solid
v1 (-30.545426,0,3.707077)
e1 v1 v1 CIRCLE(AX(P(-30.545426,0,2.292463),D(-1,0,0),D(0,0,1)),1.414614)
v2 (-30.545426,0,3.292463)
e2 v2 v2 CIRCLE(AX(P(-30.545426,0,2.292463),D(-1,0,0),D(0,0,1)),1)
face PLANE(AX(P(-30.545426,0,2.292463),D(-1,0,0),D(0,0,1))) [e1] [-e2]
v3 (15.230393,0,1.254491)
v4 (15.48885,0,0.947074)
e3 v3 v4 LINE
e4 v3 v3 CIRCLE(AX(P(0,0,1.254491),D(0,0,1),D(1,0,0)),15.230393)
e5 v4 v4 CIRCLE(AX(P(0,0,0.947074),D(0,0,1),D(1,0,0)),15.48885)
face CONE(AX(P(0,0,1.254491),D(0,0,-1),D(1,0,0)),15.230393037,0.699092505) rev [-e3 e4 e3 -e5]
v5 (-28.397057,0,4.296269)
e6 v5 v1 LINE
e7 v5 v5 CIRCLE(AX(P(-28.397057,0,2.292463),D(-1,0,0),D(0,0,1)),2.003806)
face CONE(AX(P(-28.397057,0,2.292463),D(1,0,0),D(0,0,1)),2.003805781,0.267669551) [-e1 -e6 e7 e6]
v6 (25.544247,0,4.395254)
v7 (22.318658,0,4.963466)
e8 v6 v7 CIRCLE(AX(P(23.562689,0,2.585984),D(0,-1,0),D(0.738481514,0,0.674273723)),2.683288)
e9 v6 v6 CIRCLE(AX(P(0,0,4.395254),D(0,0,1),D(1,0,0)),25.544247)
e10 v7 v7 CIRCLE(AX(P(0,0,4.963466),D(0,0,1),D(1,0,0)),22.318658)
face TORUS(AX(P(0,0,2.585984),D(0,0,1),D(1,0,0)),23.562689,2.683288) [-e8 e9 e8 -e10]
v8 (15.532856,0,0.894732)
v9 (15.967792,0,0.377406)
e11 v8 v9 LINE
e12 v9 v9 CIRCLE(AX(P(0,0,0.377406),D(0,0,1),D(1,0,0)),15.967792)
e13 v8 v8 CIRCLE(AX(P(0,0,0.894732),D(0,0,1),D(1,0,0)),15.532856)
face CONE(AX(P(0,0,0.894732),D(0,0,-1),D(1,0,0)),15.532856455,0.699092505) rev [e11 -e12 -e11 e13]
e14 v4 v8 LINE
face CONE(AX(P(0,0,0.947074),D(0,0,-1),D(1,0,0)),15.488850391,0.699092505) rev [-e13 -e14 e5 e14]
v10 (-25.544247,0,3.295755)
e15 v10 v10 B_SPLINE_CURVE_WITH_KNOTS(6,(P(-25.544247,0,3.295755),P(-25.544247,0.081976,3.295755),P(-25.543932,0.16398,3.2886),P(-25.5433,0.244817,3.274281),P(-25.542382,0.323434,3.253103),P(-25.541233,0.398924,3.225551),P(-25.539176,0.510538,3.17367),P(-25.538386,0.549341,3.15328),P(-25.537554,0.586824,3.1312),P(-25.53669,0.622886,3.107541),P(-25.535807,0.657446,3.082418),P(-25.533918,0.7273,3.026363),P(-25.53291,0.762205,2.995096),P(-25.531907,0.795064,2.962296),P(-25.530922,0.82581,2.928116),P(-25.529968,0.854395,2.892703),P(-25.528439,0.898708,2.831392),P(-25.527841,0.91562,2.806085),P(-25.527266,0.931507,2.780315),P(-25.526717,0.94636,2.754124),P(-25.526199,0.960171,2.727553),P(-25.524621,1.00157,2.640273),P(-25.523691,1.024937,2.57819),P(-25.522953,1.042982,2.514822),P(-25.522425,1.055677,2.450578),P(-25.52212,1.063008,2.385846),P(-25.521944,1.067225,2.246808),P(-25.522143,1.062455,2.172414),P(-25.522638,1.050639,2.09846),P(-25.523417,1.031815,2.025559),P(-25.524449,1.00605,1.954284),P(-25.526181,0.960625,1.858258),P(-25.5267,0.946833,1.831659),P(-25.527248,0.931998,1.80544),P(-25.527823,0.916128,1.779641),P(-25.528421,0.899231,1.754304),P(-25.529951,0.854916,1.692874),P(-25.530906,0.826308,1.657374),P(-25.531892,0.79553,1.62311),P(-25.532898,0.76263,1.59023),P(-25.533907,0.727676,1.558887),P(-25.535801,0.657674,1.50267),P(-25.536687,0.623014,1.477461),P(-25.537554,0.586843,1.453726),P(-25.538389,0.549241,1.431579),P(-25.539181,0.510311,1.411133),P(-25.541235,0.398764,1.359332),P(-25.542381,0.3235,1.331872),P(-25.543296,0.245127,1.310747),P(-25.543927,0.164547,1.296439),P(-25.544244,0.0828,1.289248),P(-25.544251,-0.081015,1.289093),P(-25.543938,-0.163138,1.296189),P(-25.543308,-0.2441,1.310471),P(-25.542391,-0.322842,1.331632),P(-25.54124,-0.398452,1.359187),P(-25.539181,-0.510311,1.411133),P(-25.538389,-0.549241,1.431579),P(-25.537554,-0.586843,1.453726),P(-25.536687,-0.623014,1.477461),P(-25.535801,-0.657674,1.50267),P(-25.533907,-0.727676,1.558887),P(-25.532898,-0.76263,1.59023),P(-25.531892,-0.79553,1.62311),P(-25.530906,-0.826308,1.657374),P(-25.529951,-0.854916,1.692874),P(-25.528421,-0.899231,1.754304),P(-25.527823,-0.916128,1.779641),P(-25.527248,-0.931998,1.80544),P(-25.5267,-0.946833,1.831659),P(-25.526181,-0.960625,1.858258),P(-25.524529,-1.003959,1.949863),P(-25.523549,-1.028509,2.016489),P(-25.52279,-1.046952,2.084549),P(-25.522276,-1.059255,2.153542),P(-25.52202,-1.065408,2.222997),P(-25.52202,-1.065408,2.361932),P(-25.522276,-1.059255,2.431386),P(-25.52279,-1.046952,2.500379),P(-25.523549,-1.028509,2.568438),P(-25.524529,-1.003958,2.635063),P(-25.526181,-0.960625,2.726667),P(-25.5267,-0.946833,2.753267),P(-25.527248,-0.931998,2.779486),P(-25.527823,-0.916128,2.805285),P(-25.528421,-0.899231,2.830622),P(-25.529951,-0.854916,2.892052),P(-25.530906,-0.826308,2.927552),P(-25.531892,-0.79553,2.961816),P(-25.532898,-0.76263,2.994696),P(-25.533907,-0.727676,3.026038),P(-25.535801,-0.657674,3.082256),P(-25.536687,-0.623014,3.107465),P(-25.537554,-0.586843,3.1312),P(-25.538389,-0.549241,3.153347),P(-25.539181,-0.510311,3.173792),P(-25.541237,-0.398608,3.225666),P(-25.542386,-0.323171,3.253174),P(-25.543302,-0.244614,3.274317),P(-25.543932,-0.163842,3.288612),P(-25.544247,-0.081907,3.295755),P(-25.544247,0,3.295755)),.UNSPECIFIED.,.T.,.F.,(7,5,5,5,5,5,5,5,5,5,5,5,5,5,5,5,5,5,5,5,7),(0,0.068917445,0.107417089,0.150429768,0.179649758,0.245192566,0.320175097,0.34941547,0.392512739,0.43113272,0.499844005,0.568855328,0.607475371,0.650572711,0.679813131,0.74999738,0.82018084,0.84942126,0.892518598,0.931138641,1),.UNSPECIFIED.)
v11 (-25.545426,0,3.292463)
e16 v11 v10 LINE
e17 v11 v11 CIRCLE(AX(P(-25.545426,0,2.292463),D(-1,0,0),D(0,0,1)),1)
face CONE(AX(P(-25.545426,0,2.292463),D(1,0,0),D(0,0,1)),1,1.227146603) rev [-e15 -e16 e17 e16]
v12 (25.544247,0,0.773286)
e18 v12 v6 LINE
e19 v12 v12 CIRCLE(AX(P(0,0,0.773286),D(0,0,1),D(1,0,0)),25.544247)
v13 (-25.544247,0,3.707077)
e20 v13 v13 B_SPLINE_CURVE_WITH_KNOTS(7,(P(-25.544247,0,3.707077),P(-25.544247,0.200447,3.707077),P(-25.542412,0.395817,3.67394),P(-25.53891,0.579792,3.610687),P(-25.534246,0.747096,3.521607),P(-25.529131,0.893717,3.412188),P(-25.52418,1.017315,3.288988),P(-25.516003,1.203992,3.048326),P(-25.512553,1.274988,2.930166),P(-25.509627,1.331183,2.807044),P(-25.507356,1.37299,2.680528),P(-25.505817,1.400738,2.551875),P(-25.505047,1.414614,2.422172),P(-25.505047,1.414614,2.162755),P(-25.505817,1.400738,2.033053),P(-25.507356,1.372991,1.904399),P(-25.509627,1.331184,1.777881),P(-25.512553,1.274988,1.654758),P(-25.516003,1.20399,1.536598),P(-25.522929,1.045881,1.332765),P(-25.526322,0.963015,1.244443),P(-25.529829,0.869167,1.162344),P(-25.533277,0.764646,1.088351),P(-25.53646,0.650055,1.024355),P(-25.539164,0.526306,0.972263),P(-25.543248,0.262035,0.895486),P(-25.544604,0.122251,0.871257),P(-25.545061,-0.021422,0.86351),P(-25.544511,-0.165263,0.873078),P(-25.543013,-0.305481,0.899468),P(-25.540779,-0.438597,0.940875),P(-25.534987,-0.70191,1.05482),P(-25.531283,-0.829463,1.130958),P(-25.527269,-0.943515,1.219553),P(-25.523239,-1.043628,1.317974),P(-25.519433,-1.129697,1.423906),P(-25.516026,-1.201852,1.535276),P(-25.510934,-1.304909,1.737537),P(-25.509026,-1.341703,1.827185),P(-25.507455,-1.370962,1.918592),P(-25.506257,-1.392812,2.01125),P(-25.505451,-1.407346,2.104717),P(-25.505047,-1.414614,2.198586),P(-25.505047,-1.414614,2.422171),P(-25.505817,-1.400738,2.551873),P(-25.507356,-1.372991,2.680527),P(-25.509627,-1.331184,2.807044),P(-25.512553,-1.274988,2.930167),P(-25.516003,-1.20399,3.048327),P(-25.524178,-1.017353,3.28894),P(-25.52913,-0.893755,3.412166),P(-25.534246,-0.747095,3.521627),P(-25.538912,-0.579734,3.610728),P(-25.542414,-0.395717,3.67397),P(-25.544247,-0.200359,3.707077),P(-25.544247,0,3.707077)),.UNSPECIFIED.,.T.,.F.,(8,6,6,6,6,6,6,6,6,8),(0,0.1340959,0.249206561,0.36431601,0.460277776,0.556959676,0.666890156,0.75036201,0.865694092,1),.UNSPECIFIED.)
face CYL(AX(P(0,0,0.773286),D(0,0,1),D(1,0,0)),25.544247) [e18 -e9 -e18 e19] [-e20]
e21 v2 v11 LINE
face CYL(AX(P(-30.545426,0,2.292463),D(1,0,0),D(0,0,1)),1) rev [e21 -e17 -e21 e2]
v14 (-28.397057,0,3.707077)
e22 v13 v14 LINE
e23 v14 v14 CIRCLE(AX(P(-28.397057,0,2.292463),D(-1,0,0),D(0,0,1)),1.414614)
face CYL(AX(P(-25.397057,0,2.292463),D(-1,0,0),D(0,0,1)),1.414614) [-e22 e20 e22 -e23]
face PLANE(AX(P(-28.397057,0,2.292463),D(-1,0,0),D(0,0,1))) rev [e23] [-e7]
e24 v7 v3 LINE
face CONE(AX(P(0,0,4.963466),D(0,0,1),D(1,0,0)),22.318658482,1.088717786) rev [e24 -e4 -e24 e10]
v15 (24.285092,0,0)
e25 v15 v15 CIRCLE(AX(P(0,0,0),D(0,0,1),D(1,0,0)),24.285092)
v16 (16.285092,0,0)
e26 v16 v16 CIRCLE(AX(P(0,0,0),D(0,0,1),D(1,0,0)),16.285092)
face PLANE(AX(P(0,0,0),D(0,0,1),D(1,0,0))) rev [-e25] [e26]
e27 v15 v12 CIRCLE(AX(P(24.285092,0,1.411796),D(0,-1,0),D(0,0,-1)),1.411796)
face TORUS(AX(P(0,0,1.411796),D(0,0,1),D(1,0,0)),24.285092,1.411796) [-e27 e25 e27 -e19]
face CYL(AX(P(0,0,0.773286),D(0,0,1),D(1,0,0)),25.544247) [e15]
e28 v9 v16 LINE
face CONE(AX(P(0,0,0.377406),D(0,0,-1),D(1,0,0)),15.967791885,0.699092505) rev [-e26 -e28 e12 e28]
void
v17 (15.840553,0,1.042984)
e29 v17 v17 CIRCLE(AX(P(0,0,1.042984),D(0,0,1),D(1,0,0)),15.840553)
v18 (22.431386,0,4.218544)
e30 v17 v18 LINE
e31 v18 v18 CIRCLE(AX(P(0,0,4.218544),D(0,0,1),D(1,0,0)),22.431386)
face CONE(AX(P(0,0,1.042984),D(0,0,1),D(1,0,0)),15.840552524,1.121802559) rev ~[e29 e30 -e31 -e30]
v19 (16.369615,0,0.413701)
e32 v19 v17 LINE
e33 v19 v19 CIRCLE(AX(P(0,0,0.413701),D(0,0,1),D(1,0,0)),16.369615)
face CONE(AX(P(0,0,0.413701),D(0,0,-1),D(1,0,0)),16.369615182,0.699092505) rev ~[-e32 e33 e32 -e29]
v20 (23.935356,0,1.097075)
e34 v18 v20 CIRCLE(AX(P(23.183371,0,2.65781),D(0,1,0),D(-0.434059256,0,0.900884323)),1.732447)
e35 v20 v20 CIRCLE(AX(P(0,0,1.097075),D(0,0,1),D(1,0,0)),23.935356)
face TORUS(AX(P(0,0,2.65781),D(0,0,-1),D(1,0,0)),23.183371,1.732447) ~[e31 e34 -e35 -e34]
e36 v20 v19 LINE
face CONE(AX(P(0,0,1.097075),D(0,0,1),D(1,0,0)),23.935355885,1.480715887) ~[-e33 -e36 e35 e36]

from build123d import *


# Not quite as in the source:
# - a feature names something its author has since deleted; it is built from what else it names


with BuildPart() as f1:
    # F0 (on Front) → F1 (revolve)
    with BuildSketch(Plane.XZ):
        with BuildLine():
            Line((22.3186584817, 4.9634656969), (15.2303930372, 1.2544910423))
            Line((15.2303930372, 1.2544910423), (15.488850391, 0.9470738952))
            Line((15.488850391, 0.9470738952), (15.5328564546, 0.894731726))
            Line((15.5328564546, 0.894731726), (15.8405525238, 1.0429841968))
            Line((15.8405525238, 1.0429841968), (22.4313864066, 4.2185444515))
            ThreePointArc((22.4313864066, 4.2185444515), (24.744105662, 3.4097946744), (23.9353558848, 1.097075419))
            Line((23.9353558848, 1.097075419), (16.3696151821, 0.4137007552))
            Line((16.3696151821, 0.4137007552), (15.9677918852, 0.3774061119))
            Line((15.9677918852, 0.3774061119), (16.2850916386, 0))
            Line((16.2850916386, 0), (24.2850916386, 0))
            ThreePointArc((24.2850916386, 0), (25.023915829, 0.2087553322), (25.5442474517, 0.7732860891))
            Line((25.5442474517, 0.7732860891), (25.5442474517, 4.3952541752))
            ThreePointArc((25.5442474517, 4.3952541752), (24.028202675, 5.2285828576), (22.3186584817, 4.9634656969))
        make_face()
        Polygon((15.8405525238, 1.0429841968), (15.5328564546, 0.894731726), (15.9677918852, 0.3774061119), (16.3696151821, 0.4137007552), align=None)
    revolve(axis=Axis((0, 0, 1.8443568842), (0, 0, 1)))

    # F2 (on Front) → F3 (revolve)
    with BuildSketch(Plane.XZ):
        Polygon((-25.3970567137, 3.7070766557), (-28.3970567137, 3.7070766557), (-28.3970567137, 4.2962685693), (-30.5454257131, 3.7070766557), (-30.5454257131, 3.2924627885), (-25.5454257131, 3.2924627885), align=None)
    revolve(axis=Axis((-26.2971473858, 0, 2.2924627885), (-1, 0, 0)))


solid = f1.part
